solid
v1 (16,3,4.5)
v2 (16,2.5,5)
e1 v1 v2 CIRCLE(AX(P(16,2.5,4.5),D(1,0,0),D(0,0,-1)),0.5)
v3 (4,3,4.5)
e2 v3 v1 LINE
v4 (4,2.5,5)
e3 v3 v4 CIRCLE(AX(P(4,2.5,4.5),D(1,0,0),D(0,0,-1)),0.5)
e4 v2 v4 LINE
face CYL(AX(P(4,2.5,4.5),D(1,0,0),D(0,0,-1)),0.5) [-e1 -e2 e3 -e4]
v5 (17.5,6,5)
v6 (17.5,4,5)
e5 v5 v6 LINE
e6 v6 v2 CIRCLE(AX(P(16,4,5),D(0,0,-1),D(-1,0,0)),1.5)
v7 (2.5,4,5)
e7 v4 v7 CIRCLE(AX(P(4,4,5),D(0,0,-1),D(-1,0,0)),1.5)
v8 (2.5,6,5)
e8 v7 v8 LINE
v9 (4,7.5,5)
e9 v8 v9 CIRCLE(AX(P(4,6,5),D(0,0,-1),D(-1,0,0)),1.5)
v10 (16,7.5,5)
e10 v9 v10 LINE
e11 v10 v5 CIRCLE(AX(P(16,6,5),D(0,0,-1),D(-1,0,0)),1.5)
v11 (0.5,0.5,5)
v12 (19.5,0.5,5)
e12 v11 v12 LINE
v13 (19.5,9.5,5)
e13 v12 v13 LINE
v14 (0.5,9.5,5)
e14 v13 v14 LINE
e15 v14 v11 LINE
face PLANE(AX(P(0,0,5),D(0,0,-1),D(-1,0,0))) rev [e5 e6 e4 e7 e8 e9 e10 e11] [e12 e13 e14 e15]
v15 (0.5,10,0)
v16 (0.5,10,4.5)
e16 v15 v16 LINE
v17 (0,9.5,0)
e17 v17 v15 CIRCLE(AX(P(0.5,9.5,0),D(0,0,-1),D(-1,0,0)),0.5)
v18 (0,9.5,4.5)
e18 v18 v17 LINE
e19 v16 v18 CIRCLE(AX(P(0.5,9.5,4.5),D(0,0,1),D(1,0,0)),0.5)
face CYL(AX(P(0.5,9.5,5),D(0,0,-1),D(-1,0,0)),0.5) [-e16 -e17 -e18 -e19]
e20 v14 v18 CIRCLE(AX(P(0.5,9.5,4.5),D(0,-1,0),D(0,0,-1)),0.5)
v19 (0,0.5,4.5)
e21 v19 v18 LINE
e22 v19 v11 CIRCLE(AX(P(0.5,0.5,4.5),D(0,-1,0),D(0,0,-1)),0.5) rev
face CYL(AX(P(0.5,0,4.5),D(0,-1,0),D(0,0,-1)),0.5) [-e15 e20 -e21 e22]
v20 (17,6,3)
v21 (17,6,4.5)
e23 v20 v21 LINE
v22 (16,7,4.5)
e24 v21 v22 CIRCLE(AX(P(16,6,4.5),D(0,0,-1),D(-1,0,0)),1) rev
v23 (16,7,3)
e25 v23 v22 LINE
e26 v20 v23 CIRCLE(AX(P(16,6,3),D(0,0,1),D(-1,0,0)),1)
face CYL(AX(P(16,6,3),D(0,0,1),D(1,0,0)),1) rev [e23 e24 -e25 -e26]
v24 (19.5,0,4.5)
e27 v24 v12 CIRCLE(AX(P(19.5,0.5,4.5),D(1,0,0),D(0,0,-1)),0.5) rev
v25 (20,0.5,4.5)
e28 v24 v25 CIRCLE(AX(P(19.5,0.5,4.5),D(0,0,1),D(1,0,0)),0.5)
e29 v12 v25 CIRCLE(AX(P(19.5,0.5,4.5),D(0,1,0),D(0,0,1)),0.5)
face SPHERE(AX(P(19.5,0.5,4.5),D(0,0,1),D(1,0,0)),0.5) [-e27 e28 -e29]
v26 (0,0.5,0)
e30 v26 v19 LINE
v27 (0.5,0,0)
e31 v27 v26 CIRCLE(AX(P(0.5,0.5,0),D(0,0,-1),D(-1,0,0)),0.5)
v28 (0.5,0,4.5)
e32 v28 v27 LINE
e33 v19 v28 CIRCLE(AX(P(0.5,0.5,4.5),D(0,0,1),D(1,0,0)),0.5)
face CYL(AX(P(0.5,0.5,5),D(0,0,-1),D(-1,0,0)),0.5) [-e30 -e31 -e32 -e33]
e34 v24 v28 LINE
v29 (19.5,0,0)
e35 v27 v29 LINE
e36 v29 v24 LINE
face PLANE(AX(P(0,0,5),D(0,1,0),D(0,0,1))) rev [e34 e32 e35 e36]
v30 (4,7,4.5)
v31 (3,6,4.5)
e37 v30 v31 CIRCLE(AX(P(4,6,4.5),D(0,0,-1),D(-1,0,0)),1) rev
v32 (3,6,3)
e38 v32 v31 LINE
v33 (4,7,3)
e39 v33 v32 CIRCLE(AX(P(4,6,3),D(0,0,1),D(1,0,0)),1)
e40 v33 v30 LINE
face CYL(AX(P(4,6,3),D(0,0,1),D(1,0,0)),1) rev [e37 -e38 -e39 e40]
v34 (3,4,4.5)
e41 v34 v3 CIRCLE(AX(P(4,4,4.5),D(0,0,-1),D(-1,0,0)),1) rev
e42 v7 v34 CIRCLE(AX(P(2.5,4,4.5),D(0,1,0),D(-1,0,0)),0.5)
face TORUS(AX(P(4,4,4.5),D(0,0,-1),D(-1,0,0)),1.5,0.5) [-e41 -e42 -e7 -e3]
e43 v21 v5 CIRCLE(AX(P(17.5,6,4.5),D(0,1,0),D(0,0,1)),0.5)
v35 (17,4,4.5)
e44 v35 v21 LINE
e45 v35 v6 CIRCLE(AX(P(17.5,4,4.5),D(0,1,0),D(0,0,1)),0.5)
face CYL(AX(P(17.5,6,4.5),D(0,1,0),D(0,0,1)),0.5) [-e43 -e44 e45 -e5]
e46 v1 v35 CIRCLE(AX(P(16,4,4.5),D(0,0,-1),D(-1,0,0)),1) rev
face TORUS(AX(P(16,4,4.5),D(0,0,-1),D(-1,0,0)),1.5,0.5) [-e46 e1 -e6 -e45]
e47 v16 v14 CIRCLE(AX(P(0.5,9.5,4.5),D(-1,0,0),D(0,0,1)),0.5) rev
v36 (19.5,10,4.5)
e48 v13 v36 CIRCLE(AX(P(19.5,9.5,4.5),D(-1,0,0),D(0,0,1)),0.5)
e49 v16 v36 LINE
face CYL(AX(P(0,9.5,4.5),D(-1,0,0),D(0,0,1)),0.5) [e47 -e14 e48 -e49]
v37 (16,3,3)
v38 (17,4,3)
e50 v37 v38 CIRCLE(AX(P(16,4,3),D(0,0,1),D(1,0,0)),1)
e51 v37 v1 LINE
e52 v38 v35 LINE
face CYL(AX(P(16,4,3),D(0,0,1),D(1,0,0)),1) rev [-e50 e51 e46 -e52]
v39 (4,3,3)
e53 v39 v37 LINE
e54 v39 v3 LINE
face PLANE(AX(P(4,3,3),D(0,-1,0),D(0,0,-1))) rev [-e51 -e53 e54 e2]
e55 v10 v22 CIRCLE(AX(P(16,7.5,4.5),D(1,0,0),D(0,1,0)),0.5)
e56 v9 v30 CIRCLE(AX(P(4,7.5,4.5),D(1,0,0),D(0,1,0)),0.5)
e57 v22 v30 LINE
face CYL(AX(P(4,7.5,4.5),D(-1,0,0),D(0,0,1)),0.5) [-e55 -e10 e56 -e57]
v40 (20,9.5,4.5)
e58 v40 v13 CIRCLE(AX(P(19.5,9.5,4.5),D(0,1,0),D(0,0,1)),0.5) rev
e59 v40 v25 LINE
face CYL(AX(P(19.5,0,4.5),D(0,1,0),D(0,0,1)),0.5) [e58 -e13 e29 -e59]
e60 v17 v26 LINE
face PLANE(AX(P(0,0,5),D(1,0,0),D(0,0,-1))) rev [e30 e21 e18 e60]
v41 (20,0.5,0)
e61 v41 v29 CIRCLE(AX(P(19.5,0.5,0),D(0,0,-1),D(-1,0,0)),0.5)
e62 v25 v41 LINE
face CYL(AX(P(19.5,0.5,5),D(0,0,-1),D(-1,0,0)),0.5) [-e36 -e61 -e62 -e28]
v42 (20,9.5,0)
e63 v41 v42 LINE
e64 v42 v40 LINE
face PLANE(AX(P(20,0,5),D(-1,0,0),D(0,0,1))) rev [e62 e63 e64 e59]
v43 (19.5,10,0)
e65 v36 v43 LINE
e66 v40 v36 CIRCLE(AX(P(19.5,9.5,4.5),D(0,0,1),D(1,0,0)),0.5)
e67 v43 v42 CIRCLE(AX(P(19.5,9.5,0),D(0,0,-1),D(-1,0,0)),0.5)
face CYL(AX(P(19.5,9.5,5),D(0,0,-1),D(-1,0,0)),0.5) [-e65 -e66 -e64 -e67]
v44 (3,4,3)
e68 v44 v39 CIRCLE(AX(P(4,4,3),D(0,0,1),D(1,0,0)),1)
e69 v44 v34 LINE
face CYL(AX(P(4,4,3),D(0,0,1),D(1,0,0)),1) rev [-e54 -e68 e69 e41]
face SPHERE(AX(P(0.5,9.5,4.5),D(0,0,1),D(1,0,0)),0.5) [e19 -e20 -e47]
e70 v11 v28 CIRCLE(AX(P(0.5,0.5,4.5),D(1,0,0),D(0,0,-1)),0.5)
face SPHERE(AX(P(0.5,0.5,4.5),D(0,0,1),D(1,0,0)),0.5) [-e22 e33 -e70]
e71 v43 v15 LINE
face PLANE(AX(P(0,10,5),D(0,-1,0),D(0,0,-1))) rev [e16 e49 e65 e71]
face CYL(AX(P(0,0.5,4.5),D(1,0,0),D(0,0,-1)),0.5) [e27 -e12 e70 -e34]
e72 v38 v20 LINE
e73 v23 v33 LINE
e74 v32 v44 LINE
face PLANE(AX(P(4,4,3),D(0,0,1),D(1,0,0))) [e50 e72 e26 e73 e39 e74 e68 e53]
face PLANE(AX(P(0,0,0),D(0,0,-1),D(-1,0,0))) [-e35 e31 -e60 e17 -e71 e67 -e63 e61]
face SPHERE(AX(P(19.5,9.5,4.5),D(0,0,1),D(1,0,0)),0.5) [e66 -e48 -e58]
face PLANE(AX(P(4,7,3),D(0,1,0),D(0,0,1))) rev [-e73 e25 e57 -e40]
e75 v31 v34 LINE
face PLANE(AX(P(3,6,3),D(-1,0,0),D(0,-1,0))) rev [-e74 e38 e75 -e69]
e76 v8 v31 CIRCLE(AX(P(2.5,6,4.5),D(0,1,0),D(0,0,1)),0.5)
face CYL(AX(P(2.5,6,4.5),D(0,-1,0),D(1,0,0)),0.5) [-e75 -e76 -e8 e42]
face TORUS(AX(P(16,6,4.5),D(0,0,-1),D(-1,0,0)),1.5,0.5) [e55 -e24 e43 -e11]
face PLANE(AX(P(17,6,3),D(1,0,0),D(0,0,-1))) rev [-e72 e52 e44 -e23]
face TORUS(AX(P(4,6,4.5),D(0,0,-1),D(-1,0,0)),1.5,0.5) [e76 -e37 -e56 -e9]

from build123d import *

# Parameters (mm, degrees)
SKIZZE1_W                       = 20
SKIZZE1_H                       = 10
AUFSATZ_LINEAR_AUSTRAGEN1_DEPTH = 5
SCHNITT_LINEAR_AUSTRAGEN2_DEPTH = 2
VERRUNDUNG2_R                   = 0.5
VERRUNDUNG3_R                   = 0.5
VERRUNDUNG4_R                   = 0.5
VERRUNDUNG5_R                   = 0.5
VERRUNDUNG6_R                   = 0.5
VERRUNDUNG7_R                   = 0.5


with BuildPart() as part:
    # Skizze1 → Aufsatz-Linear austragen1 (new body)
    with BuildSketch(Plane.XY):
        with Locations((10, 5)):
            Rectangle(SKIZZE1_W, SKIZZE1_H)
    extrude(amount=AUFSATZ_LINEAR_AUSTRAGEN1_DEPTH)

    # Skizze3 → Schnitt-Linear austragen2 (cut)
    with BuildSketch(Plane.XY.offset(5)):
        with BuildLine():
            Line((4, 7), (16, 7))
            ThreePointArc((16, 7), (16.707106781, 6.707106781), (17, 6))
            Line((17, 6), (17, 4))
            ThreePointArc((17, 4), (16.707106781, 3.292893219), (16, 3))
            Line((16, 3), (4, 3))
            ThreePointArc((4, 3), (3.292893219, 3.292893219), (3, 4))
            Line((3, 4), (3, 6))
            ThreePointArc((3, 6), (3.292893219, 6.707106781), (4, 7))
        make_face()
    extrude(amount=-SCHNITT_LINEAR_AUSTRAGEN2_DEPTH, mode=Mode.SUBTRACT)

    # Verrundung2
    verrundung2_edges = [part.edges().sort_by_distance(p)[0] for p in [
        (3.292893219, 3.292893219, 5),
        (10, 3, 5),
        (16.707106781, 3.292893219, 5),
        (17, 5, 5),
        (16.707106781, 6.707106781, 5),
        (10, 7, 5),
        (3.292893219, 6.707106781, 5),
        (3, 5, 5),
    ]]
    fillet(verrundung2_edges, radius=VERRUNDUNG2_R)

    # Verrundung3
    verrundung3_edges = [part.edges().sort_by_distance(p)[0] for p in [
        (20, 5, 5),
        (10, 10, 5),
        (0, 5, 5),
        (10, 0, 5),
    ]]
    fillet(verrundung3_edges, radius=VERRUNDUNG3_R)

    # Verrundung4
    # the kernel refuses this fillet: 0.5 mm, written as the material it takes off along each edge
    with BuildSketch(Plane(origin=(19.5, 9.5, 4.5), x_dir=(0, 1, 0), z_dir=(1, 0, 0))) as verrundung4_piece_1_section:
        Polygon((0, 0), (VERRUNDUNG4_R, 0), (VERRUNDUNG4_R, VERRUNDUNG4_R), (0, VERRUNDUNG4_R), align=None)
    verrundung4_piece_1 = extrude(amount=VERRUNDUNG4_R, mode=Mode.PRIVATE)
    verrundung4_piece_1 = verrundung4_piece_1 - Plane(origin=(19.5, 9.5, 4.5), x_dir=(0, -0.7071067811865475, -0.7071067811865475), z_dir=(1, 0, 0)) * Sphere(VERRUNDUNG4_R, mode=Mode.PRIVATE)
    add(verrundung4_piece_1, mode=Mode.SUBTRACT)
    with BuildSketch(Plane(origin=(20, 10, -1.25), x_dir=(0, -1, 0), z_dir=(0, 0, 1))) as verrundung4_piece_2:
        with BuildLine():
            CenterArc((VERRUNDUNG4_R, -VERRUNDUNG4_R), VERRUNDUNG4_R, 90, 90)
            Line((0, -VERRUNDUNG4_R), (0, 0))
            Line((0, 0), (VERRUNDUNG4_R, 0))
        make_face()
    extrude(amount=5.75, mode=Mode.SUBTRACT)

    # Verrundung5
    # the kernel refuses this fillet: 0.5 mm, written as the material it takes off along each edge
    with BuildSketch(Plane(origin=(0.5, 9.5, 4.5), x_dir=(-1, 0, 0), z_dir=(0, 1, 0))) as verrundung5_piece_1_section:
        Polygon((0, 0), (VERRUNDUNG5_R, 0), (VERRUNDUNG5_R, VERRUNDUNG5_R), (0, VERRUNDUNG5_R), align=None)
    verrundung5_piece_1 = extrude(amount=VERRUNDUNG5_R, mode=Mode.PRIVATE)
    verrundung5_piece_1 = verrundung5_piece_1 - Plane(origin=(0.5, 9.5, 4.5), x_dir=(0.7071067811865475, 0, -0.7071067811865475), z_dir=(0, 1, 0)) * Sphere(VERRUNDUNG5_R, mode=Mode.PRIVATE)
    add(verrundung5_piece_1, mode=Mode.SUBTRACT)
    with BuildSketch(Plane(origin=(0, 10, -1.25), x_dir=(1, 0, 0), z_dir=(0, 0, 1))) as verrundung5_piece_2:
        with BuildLine():
            CenterArc((VERRUNDUNG5_R, -VERRUNDUNG5_R), VERRUNDUNG5_R, 90, 90)
            Line((0, -VERRUNDUNG5_R), (0, 0))
            Line((0, 0), (VERRUNDUNG5_R, 0))
        make_face()
    extrude(amount=5.75, mode=Mode.SUBTRACT)

    # Verrundung6
    # the kernel refuses this fillet: 0.5 mm, written as the material it takes off along each edge
    with BuildSketch(Plane(origin=(0.5, 0.5, 4.5), x_dir=(-1, 0, 0), z_dir=(0, -1, 0))) as verrundung6_piece_1_section:
        Polygon((0, 0), (VERRUNDUNG6_R, 0), (VERRUNDUNG6_R, -VERRUNDUNG6_R), (0, -VERRUNDUNG6_R), align=None)
    verrundung6_piece_1 = extrude(amount=VERRUNDUNG6_R, mode=Mode.PRIVATE)
    verrundung6_piece_1 = verrundung6_piece_1 - Plane(origin=(0.5, 0.5, 4.5), x_dir=(0.7071067811865475, 0, -0.7071067811865475), z_dir=(0, -1, 0)) * Sphere(VERRUNDUNG6_R, mode=Mode.PRIVATE)
    add(verrundung6_piece_1, mode=Mode.SUBTRACT)
    with BuildSketch(Plane(origin=(0, 0, -1.25), x_dir=(1, 0, 0), z_dir=(0, 0, 1))) as verrundung6_piece_2:
        with BuildLine():
            CenterArc((VERRUNDUNG6_R, VERRUNDUNG6_R), VERRUNDUNG6_R, 180, 90)
            Line((0, VERRUNDUNG6_R), (0, 0))
            Line((0, 0), (VERRUNDUNG6_R, 0))
        make_face()
    extrude(amount=5.75, mode=Mode.SUBTRACT)

    # Verrundung7
    # the kernel refuses this fillet: 0.5 mm, written as the material it takes off along each edge
    with BuildSketch(Plane(origin=(19.5, 0.5, 4.5), x_dir=(0, -1, 0), z_dir=(1, 0, 0))) as verrundung7_piece_1_section:
        Polygon((0, 0), (VERRUNDUNG7_R, 0), (VERRUNDUNG7_R, -VERRUNDUNG7_R), (0, -VERRUNDUNG7_R), align=None)
    verrundung7_piece_1 = extrude(amount=VERRUNDUNG7_R, mode=Mode.PRIVATE)
    verrundung7_piece_1 = verrundung7_piece_1 - Plane(origin=(19.5, 0.5, 4.5), x_dir=(0, 0.7071067811865475, -0.7071067811865475), z_dir=(1, 0, 0)) * Sphere(VERRUNDUNG7_R, mode=Mode.PRIVATE)
    add(verrundung7_piece_1, mode=Mode.SUBTRACT)
    with BuildSketch(Plane(origin=(20, 0, -1.25), x_dir=(0, 1, 0), z_dir=(0, 0, 1))) as verrundung7_piece_2:
        with BuildLine():
            CenterArc((VERRUNDUNG7_R, VERRUNDUNG7_R), VERRUNDUNG7_R, 180, 90)
            Line((0, VERRUNDUNG7_R), (0, 0))
            Line((0, 0), (VERRUNDUNG7_R, 0))
        make_face()
    extrude(amount=5.75, mode=Mode.SUBTRACT)


solid = part.part
